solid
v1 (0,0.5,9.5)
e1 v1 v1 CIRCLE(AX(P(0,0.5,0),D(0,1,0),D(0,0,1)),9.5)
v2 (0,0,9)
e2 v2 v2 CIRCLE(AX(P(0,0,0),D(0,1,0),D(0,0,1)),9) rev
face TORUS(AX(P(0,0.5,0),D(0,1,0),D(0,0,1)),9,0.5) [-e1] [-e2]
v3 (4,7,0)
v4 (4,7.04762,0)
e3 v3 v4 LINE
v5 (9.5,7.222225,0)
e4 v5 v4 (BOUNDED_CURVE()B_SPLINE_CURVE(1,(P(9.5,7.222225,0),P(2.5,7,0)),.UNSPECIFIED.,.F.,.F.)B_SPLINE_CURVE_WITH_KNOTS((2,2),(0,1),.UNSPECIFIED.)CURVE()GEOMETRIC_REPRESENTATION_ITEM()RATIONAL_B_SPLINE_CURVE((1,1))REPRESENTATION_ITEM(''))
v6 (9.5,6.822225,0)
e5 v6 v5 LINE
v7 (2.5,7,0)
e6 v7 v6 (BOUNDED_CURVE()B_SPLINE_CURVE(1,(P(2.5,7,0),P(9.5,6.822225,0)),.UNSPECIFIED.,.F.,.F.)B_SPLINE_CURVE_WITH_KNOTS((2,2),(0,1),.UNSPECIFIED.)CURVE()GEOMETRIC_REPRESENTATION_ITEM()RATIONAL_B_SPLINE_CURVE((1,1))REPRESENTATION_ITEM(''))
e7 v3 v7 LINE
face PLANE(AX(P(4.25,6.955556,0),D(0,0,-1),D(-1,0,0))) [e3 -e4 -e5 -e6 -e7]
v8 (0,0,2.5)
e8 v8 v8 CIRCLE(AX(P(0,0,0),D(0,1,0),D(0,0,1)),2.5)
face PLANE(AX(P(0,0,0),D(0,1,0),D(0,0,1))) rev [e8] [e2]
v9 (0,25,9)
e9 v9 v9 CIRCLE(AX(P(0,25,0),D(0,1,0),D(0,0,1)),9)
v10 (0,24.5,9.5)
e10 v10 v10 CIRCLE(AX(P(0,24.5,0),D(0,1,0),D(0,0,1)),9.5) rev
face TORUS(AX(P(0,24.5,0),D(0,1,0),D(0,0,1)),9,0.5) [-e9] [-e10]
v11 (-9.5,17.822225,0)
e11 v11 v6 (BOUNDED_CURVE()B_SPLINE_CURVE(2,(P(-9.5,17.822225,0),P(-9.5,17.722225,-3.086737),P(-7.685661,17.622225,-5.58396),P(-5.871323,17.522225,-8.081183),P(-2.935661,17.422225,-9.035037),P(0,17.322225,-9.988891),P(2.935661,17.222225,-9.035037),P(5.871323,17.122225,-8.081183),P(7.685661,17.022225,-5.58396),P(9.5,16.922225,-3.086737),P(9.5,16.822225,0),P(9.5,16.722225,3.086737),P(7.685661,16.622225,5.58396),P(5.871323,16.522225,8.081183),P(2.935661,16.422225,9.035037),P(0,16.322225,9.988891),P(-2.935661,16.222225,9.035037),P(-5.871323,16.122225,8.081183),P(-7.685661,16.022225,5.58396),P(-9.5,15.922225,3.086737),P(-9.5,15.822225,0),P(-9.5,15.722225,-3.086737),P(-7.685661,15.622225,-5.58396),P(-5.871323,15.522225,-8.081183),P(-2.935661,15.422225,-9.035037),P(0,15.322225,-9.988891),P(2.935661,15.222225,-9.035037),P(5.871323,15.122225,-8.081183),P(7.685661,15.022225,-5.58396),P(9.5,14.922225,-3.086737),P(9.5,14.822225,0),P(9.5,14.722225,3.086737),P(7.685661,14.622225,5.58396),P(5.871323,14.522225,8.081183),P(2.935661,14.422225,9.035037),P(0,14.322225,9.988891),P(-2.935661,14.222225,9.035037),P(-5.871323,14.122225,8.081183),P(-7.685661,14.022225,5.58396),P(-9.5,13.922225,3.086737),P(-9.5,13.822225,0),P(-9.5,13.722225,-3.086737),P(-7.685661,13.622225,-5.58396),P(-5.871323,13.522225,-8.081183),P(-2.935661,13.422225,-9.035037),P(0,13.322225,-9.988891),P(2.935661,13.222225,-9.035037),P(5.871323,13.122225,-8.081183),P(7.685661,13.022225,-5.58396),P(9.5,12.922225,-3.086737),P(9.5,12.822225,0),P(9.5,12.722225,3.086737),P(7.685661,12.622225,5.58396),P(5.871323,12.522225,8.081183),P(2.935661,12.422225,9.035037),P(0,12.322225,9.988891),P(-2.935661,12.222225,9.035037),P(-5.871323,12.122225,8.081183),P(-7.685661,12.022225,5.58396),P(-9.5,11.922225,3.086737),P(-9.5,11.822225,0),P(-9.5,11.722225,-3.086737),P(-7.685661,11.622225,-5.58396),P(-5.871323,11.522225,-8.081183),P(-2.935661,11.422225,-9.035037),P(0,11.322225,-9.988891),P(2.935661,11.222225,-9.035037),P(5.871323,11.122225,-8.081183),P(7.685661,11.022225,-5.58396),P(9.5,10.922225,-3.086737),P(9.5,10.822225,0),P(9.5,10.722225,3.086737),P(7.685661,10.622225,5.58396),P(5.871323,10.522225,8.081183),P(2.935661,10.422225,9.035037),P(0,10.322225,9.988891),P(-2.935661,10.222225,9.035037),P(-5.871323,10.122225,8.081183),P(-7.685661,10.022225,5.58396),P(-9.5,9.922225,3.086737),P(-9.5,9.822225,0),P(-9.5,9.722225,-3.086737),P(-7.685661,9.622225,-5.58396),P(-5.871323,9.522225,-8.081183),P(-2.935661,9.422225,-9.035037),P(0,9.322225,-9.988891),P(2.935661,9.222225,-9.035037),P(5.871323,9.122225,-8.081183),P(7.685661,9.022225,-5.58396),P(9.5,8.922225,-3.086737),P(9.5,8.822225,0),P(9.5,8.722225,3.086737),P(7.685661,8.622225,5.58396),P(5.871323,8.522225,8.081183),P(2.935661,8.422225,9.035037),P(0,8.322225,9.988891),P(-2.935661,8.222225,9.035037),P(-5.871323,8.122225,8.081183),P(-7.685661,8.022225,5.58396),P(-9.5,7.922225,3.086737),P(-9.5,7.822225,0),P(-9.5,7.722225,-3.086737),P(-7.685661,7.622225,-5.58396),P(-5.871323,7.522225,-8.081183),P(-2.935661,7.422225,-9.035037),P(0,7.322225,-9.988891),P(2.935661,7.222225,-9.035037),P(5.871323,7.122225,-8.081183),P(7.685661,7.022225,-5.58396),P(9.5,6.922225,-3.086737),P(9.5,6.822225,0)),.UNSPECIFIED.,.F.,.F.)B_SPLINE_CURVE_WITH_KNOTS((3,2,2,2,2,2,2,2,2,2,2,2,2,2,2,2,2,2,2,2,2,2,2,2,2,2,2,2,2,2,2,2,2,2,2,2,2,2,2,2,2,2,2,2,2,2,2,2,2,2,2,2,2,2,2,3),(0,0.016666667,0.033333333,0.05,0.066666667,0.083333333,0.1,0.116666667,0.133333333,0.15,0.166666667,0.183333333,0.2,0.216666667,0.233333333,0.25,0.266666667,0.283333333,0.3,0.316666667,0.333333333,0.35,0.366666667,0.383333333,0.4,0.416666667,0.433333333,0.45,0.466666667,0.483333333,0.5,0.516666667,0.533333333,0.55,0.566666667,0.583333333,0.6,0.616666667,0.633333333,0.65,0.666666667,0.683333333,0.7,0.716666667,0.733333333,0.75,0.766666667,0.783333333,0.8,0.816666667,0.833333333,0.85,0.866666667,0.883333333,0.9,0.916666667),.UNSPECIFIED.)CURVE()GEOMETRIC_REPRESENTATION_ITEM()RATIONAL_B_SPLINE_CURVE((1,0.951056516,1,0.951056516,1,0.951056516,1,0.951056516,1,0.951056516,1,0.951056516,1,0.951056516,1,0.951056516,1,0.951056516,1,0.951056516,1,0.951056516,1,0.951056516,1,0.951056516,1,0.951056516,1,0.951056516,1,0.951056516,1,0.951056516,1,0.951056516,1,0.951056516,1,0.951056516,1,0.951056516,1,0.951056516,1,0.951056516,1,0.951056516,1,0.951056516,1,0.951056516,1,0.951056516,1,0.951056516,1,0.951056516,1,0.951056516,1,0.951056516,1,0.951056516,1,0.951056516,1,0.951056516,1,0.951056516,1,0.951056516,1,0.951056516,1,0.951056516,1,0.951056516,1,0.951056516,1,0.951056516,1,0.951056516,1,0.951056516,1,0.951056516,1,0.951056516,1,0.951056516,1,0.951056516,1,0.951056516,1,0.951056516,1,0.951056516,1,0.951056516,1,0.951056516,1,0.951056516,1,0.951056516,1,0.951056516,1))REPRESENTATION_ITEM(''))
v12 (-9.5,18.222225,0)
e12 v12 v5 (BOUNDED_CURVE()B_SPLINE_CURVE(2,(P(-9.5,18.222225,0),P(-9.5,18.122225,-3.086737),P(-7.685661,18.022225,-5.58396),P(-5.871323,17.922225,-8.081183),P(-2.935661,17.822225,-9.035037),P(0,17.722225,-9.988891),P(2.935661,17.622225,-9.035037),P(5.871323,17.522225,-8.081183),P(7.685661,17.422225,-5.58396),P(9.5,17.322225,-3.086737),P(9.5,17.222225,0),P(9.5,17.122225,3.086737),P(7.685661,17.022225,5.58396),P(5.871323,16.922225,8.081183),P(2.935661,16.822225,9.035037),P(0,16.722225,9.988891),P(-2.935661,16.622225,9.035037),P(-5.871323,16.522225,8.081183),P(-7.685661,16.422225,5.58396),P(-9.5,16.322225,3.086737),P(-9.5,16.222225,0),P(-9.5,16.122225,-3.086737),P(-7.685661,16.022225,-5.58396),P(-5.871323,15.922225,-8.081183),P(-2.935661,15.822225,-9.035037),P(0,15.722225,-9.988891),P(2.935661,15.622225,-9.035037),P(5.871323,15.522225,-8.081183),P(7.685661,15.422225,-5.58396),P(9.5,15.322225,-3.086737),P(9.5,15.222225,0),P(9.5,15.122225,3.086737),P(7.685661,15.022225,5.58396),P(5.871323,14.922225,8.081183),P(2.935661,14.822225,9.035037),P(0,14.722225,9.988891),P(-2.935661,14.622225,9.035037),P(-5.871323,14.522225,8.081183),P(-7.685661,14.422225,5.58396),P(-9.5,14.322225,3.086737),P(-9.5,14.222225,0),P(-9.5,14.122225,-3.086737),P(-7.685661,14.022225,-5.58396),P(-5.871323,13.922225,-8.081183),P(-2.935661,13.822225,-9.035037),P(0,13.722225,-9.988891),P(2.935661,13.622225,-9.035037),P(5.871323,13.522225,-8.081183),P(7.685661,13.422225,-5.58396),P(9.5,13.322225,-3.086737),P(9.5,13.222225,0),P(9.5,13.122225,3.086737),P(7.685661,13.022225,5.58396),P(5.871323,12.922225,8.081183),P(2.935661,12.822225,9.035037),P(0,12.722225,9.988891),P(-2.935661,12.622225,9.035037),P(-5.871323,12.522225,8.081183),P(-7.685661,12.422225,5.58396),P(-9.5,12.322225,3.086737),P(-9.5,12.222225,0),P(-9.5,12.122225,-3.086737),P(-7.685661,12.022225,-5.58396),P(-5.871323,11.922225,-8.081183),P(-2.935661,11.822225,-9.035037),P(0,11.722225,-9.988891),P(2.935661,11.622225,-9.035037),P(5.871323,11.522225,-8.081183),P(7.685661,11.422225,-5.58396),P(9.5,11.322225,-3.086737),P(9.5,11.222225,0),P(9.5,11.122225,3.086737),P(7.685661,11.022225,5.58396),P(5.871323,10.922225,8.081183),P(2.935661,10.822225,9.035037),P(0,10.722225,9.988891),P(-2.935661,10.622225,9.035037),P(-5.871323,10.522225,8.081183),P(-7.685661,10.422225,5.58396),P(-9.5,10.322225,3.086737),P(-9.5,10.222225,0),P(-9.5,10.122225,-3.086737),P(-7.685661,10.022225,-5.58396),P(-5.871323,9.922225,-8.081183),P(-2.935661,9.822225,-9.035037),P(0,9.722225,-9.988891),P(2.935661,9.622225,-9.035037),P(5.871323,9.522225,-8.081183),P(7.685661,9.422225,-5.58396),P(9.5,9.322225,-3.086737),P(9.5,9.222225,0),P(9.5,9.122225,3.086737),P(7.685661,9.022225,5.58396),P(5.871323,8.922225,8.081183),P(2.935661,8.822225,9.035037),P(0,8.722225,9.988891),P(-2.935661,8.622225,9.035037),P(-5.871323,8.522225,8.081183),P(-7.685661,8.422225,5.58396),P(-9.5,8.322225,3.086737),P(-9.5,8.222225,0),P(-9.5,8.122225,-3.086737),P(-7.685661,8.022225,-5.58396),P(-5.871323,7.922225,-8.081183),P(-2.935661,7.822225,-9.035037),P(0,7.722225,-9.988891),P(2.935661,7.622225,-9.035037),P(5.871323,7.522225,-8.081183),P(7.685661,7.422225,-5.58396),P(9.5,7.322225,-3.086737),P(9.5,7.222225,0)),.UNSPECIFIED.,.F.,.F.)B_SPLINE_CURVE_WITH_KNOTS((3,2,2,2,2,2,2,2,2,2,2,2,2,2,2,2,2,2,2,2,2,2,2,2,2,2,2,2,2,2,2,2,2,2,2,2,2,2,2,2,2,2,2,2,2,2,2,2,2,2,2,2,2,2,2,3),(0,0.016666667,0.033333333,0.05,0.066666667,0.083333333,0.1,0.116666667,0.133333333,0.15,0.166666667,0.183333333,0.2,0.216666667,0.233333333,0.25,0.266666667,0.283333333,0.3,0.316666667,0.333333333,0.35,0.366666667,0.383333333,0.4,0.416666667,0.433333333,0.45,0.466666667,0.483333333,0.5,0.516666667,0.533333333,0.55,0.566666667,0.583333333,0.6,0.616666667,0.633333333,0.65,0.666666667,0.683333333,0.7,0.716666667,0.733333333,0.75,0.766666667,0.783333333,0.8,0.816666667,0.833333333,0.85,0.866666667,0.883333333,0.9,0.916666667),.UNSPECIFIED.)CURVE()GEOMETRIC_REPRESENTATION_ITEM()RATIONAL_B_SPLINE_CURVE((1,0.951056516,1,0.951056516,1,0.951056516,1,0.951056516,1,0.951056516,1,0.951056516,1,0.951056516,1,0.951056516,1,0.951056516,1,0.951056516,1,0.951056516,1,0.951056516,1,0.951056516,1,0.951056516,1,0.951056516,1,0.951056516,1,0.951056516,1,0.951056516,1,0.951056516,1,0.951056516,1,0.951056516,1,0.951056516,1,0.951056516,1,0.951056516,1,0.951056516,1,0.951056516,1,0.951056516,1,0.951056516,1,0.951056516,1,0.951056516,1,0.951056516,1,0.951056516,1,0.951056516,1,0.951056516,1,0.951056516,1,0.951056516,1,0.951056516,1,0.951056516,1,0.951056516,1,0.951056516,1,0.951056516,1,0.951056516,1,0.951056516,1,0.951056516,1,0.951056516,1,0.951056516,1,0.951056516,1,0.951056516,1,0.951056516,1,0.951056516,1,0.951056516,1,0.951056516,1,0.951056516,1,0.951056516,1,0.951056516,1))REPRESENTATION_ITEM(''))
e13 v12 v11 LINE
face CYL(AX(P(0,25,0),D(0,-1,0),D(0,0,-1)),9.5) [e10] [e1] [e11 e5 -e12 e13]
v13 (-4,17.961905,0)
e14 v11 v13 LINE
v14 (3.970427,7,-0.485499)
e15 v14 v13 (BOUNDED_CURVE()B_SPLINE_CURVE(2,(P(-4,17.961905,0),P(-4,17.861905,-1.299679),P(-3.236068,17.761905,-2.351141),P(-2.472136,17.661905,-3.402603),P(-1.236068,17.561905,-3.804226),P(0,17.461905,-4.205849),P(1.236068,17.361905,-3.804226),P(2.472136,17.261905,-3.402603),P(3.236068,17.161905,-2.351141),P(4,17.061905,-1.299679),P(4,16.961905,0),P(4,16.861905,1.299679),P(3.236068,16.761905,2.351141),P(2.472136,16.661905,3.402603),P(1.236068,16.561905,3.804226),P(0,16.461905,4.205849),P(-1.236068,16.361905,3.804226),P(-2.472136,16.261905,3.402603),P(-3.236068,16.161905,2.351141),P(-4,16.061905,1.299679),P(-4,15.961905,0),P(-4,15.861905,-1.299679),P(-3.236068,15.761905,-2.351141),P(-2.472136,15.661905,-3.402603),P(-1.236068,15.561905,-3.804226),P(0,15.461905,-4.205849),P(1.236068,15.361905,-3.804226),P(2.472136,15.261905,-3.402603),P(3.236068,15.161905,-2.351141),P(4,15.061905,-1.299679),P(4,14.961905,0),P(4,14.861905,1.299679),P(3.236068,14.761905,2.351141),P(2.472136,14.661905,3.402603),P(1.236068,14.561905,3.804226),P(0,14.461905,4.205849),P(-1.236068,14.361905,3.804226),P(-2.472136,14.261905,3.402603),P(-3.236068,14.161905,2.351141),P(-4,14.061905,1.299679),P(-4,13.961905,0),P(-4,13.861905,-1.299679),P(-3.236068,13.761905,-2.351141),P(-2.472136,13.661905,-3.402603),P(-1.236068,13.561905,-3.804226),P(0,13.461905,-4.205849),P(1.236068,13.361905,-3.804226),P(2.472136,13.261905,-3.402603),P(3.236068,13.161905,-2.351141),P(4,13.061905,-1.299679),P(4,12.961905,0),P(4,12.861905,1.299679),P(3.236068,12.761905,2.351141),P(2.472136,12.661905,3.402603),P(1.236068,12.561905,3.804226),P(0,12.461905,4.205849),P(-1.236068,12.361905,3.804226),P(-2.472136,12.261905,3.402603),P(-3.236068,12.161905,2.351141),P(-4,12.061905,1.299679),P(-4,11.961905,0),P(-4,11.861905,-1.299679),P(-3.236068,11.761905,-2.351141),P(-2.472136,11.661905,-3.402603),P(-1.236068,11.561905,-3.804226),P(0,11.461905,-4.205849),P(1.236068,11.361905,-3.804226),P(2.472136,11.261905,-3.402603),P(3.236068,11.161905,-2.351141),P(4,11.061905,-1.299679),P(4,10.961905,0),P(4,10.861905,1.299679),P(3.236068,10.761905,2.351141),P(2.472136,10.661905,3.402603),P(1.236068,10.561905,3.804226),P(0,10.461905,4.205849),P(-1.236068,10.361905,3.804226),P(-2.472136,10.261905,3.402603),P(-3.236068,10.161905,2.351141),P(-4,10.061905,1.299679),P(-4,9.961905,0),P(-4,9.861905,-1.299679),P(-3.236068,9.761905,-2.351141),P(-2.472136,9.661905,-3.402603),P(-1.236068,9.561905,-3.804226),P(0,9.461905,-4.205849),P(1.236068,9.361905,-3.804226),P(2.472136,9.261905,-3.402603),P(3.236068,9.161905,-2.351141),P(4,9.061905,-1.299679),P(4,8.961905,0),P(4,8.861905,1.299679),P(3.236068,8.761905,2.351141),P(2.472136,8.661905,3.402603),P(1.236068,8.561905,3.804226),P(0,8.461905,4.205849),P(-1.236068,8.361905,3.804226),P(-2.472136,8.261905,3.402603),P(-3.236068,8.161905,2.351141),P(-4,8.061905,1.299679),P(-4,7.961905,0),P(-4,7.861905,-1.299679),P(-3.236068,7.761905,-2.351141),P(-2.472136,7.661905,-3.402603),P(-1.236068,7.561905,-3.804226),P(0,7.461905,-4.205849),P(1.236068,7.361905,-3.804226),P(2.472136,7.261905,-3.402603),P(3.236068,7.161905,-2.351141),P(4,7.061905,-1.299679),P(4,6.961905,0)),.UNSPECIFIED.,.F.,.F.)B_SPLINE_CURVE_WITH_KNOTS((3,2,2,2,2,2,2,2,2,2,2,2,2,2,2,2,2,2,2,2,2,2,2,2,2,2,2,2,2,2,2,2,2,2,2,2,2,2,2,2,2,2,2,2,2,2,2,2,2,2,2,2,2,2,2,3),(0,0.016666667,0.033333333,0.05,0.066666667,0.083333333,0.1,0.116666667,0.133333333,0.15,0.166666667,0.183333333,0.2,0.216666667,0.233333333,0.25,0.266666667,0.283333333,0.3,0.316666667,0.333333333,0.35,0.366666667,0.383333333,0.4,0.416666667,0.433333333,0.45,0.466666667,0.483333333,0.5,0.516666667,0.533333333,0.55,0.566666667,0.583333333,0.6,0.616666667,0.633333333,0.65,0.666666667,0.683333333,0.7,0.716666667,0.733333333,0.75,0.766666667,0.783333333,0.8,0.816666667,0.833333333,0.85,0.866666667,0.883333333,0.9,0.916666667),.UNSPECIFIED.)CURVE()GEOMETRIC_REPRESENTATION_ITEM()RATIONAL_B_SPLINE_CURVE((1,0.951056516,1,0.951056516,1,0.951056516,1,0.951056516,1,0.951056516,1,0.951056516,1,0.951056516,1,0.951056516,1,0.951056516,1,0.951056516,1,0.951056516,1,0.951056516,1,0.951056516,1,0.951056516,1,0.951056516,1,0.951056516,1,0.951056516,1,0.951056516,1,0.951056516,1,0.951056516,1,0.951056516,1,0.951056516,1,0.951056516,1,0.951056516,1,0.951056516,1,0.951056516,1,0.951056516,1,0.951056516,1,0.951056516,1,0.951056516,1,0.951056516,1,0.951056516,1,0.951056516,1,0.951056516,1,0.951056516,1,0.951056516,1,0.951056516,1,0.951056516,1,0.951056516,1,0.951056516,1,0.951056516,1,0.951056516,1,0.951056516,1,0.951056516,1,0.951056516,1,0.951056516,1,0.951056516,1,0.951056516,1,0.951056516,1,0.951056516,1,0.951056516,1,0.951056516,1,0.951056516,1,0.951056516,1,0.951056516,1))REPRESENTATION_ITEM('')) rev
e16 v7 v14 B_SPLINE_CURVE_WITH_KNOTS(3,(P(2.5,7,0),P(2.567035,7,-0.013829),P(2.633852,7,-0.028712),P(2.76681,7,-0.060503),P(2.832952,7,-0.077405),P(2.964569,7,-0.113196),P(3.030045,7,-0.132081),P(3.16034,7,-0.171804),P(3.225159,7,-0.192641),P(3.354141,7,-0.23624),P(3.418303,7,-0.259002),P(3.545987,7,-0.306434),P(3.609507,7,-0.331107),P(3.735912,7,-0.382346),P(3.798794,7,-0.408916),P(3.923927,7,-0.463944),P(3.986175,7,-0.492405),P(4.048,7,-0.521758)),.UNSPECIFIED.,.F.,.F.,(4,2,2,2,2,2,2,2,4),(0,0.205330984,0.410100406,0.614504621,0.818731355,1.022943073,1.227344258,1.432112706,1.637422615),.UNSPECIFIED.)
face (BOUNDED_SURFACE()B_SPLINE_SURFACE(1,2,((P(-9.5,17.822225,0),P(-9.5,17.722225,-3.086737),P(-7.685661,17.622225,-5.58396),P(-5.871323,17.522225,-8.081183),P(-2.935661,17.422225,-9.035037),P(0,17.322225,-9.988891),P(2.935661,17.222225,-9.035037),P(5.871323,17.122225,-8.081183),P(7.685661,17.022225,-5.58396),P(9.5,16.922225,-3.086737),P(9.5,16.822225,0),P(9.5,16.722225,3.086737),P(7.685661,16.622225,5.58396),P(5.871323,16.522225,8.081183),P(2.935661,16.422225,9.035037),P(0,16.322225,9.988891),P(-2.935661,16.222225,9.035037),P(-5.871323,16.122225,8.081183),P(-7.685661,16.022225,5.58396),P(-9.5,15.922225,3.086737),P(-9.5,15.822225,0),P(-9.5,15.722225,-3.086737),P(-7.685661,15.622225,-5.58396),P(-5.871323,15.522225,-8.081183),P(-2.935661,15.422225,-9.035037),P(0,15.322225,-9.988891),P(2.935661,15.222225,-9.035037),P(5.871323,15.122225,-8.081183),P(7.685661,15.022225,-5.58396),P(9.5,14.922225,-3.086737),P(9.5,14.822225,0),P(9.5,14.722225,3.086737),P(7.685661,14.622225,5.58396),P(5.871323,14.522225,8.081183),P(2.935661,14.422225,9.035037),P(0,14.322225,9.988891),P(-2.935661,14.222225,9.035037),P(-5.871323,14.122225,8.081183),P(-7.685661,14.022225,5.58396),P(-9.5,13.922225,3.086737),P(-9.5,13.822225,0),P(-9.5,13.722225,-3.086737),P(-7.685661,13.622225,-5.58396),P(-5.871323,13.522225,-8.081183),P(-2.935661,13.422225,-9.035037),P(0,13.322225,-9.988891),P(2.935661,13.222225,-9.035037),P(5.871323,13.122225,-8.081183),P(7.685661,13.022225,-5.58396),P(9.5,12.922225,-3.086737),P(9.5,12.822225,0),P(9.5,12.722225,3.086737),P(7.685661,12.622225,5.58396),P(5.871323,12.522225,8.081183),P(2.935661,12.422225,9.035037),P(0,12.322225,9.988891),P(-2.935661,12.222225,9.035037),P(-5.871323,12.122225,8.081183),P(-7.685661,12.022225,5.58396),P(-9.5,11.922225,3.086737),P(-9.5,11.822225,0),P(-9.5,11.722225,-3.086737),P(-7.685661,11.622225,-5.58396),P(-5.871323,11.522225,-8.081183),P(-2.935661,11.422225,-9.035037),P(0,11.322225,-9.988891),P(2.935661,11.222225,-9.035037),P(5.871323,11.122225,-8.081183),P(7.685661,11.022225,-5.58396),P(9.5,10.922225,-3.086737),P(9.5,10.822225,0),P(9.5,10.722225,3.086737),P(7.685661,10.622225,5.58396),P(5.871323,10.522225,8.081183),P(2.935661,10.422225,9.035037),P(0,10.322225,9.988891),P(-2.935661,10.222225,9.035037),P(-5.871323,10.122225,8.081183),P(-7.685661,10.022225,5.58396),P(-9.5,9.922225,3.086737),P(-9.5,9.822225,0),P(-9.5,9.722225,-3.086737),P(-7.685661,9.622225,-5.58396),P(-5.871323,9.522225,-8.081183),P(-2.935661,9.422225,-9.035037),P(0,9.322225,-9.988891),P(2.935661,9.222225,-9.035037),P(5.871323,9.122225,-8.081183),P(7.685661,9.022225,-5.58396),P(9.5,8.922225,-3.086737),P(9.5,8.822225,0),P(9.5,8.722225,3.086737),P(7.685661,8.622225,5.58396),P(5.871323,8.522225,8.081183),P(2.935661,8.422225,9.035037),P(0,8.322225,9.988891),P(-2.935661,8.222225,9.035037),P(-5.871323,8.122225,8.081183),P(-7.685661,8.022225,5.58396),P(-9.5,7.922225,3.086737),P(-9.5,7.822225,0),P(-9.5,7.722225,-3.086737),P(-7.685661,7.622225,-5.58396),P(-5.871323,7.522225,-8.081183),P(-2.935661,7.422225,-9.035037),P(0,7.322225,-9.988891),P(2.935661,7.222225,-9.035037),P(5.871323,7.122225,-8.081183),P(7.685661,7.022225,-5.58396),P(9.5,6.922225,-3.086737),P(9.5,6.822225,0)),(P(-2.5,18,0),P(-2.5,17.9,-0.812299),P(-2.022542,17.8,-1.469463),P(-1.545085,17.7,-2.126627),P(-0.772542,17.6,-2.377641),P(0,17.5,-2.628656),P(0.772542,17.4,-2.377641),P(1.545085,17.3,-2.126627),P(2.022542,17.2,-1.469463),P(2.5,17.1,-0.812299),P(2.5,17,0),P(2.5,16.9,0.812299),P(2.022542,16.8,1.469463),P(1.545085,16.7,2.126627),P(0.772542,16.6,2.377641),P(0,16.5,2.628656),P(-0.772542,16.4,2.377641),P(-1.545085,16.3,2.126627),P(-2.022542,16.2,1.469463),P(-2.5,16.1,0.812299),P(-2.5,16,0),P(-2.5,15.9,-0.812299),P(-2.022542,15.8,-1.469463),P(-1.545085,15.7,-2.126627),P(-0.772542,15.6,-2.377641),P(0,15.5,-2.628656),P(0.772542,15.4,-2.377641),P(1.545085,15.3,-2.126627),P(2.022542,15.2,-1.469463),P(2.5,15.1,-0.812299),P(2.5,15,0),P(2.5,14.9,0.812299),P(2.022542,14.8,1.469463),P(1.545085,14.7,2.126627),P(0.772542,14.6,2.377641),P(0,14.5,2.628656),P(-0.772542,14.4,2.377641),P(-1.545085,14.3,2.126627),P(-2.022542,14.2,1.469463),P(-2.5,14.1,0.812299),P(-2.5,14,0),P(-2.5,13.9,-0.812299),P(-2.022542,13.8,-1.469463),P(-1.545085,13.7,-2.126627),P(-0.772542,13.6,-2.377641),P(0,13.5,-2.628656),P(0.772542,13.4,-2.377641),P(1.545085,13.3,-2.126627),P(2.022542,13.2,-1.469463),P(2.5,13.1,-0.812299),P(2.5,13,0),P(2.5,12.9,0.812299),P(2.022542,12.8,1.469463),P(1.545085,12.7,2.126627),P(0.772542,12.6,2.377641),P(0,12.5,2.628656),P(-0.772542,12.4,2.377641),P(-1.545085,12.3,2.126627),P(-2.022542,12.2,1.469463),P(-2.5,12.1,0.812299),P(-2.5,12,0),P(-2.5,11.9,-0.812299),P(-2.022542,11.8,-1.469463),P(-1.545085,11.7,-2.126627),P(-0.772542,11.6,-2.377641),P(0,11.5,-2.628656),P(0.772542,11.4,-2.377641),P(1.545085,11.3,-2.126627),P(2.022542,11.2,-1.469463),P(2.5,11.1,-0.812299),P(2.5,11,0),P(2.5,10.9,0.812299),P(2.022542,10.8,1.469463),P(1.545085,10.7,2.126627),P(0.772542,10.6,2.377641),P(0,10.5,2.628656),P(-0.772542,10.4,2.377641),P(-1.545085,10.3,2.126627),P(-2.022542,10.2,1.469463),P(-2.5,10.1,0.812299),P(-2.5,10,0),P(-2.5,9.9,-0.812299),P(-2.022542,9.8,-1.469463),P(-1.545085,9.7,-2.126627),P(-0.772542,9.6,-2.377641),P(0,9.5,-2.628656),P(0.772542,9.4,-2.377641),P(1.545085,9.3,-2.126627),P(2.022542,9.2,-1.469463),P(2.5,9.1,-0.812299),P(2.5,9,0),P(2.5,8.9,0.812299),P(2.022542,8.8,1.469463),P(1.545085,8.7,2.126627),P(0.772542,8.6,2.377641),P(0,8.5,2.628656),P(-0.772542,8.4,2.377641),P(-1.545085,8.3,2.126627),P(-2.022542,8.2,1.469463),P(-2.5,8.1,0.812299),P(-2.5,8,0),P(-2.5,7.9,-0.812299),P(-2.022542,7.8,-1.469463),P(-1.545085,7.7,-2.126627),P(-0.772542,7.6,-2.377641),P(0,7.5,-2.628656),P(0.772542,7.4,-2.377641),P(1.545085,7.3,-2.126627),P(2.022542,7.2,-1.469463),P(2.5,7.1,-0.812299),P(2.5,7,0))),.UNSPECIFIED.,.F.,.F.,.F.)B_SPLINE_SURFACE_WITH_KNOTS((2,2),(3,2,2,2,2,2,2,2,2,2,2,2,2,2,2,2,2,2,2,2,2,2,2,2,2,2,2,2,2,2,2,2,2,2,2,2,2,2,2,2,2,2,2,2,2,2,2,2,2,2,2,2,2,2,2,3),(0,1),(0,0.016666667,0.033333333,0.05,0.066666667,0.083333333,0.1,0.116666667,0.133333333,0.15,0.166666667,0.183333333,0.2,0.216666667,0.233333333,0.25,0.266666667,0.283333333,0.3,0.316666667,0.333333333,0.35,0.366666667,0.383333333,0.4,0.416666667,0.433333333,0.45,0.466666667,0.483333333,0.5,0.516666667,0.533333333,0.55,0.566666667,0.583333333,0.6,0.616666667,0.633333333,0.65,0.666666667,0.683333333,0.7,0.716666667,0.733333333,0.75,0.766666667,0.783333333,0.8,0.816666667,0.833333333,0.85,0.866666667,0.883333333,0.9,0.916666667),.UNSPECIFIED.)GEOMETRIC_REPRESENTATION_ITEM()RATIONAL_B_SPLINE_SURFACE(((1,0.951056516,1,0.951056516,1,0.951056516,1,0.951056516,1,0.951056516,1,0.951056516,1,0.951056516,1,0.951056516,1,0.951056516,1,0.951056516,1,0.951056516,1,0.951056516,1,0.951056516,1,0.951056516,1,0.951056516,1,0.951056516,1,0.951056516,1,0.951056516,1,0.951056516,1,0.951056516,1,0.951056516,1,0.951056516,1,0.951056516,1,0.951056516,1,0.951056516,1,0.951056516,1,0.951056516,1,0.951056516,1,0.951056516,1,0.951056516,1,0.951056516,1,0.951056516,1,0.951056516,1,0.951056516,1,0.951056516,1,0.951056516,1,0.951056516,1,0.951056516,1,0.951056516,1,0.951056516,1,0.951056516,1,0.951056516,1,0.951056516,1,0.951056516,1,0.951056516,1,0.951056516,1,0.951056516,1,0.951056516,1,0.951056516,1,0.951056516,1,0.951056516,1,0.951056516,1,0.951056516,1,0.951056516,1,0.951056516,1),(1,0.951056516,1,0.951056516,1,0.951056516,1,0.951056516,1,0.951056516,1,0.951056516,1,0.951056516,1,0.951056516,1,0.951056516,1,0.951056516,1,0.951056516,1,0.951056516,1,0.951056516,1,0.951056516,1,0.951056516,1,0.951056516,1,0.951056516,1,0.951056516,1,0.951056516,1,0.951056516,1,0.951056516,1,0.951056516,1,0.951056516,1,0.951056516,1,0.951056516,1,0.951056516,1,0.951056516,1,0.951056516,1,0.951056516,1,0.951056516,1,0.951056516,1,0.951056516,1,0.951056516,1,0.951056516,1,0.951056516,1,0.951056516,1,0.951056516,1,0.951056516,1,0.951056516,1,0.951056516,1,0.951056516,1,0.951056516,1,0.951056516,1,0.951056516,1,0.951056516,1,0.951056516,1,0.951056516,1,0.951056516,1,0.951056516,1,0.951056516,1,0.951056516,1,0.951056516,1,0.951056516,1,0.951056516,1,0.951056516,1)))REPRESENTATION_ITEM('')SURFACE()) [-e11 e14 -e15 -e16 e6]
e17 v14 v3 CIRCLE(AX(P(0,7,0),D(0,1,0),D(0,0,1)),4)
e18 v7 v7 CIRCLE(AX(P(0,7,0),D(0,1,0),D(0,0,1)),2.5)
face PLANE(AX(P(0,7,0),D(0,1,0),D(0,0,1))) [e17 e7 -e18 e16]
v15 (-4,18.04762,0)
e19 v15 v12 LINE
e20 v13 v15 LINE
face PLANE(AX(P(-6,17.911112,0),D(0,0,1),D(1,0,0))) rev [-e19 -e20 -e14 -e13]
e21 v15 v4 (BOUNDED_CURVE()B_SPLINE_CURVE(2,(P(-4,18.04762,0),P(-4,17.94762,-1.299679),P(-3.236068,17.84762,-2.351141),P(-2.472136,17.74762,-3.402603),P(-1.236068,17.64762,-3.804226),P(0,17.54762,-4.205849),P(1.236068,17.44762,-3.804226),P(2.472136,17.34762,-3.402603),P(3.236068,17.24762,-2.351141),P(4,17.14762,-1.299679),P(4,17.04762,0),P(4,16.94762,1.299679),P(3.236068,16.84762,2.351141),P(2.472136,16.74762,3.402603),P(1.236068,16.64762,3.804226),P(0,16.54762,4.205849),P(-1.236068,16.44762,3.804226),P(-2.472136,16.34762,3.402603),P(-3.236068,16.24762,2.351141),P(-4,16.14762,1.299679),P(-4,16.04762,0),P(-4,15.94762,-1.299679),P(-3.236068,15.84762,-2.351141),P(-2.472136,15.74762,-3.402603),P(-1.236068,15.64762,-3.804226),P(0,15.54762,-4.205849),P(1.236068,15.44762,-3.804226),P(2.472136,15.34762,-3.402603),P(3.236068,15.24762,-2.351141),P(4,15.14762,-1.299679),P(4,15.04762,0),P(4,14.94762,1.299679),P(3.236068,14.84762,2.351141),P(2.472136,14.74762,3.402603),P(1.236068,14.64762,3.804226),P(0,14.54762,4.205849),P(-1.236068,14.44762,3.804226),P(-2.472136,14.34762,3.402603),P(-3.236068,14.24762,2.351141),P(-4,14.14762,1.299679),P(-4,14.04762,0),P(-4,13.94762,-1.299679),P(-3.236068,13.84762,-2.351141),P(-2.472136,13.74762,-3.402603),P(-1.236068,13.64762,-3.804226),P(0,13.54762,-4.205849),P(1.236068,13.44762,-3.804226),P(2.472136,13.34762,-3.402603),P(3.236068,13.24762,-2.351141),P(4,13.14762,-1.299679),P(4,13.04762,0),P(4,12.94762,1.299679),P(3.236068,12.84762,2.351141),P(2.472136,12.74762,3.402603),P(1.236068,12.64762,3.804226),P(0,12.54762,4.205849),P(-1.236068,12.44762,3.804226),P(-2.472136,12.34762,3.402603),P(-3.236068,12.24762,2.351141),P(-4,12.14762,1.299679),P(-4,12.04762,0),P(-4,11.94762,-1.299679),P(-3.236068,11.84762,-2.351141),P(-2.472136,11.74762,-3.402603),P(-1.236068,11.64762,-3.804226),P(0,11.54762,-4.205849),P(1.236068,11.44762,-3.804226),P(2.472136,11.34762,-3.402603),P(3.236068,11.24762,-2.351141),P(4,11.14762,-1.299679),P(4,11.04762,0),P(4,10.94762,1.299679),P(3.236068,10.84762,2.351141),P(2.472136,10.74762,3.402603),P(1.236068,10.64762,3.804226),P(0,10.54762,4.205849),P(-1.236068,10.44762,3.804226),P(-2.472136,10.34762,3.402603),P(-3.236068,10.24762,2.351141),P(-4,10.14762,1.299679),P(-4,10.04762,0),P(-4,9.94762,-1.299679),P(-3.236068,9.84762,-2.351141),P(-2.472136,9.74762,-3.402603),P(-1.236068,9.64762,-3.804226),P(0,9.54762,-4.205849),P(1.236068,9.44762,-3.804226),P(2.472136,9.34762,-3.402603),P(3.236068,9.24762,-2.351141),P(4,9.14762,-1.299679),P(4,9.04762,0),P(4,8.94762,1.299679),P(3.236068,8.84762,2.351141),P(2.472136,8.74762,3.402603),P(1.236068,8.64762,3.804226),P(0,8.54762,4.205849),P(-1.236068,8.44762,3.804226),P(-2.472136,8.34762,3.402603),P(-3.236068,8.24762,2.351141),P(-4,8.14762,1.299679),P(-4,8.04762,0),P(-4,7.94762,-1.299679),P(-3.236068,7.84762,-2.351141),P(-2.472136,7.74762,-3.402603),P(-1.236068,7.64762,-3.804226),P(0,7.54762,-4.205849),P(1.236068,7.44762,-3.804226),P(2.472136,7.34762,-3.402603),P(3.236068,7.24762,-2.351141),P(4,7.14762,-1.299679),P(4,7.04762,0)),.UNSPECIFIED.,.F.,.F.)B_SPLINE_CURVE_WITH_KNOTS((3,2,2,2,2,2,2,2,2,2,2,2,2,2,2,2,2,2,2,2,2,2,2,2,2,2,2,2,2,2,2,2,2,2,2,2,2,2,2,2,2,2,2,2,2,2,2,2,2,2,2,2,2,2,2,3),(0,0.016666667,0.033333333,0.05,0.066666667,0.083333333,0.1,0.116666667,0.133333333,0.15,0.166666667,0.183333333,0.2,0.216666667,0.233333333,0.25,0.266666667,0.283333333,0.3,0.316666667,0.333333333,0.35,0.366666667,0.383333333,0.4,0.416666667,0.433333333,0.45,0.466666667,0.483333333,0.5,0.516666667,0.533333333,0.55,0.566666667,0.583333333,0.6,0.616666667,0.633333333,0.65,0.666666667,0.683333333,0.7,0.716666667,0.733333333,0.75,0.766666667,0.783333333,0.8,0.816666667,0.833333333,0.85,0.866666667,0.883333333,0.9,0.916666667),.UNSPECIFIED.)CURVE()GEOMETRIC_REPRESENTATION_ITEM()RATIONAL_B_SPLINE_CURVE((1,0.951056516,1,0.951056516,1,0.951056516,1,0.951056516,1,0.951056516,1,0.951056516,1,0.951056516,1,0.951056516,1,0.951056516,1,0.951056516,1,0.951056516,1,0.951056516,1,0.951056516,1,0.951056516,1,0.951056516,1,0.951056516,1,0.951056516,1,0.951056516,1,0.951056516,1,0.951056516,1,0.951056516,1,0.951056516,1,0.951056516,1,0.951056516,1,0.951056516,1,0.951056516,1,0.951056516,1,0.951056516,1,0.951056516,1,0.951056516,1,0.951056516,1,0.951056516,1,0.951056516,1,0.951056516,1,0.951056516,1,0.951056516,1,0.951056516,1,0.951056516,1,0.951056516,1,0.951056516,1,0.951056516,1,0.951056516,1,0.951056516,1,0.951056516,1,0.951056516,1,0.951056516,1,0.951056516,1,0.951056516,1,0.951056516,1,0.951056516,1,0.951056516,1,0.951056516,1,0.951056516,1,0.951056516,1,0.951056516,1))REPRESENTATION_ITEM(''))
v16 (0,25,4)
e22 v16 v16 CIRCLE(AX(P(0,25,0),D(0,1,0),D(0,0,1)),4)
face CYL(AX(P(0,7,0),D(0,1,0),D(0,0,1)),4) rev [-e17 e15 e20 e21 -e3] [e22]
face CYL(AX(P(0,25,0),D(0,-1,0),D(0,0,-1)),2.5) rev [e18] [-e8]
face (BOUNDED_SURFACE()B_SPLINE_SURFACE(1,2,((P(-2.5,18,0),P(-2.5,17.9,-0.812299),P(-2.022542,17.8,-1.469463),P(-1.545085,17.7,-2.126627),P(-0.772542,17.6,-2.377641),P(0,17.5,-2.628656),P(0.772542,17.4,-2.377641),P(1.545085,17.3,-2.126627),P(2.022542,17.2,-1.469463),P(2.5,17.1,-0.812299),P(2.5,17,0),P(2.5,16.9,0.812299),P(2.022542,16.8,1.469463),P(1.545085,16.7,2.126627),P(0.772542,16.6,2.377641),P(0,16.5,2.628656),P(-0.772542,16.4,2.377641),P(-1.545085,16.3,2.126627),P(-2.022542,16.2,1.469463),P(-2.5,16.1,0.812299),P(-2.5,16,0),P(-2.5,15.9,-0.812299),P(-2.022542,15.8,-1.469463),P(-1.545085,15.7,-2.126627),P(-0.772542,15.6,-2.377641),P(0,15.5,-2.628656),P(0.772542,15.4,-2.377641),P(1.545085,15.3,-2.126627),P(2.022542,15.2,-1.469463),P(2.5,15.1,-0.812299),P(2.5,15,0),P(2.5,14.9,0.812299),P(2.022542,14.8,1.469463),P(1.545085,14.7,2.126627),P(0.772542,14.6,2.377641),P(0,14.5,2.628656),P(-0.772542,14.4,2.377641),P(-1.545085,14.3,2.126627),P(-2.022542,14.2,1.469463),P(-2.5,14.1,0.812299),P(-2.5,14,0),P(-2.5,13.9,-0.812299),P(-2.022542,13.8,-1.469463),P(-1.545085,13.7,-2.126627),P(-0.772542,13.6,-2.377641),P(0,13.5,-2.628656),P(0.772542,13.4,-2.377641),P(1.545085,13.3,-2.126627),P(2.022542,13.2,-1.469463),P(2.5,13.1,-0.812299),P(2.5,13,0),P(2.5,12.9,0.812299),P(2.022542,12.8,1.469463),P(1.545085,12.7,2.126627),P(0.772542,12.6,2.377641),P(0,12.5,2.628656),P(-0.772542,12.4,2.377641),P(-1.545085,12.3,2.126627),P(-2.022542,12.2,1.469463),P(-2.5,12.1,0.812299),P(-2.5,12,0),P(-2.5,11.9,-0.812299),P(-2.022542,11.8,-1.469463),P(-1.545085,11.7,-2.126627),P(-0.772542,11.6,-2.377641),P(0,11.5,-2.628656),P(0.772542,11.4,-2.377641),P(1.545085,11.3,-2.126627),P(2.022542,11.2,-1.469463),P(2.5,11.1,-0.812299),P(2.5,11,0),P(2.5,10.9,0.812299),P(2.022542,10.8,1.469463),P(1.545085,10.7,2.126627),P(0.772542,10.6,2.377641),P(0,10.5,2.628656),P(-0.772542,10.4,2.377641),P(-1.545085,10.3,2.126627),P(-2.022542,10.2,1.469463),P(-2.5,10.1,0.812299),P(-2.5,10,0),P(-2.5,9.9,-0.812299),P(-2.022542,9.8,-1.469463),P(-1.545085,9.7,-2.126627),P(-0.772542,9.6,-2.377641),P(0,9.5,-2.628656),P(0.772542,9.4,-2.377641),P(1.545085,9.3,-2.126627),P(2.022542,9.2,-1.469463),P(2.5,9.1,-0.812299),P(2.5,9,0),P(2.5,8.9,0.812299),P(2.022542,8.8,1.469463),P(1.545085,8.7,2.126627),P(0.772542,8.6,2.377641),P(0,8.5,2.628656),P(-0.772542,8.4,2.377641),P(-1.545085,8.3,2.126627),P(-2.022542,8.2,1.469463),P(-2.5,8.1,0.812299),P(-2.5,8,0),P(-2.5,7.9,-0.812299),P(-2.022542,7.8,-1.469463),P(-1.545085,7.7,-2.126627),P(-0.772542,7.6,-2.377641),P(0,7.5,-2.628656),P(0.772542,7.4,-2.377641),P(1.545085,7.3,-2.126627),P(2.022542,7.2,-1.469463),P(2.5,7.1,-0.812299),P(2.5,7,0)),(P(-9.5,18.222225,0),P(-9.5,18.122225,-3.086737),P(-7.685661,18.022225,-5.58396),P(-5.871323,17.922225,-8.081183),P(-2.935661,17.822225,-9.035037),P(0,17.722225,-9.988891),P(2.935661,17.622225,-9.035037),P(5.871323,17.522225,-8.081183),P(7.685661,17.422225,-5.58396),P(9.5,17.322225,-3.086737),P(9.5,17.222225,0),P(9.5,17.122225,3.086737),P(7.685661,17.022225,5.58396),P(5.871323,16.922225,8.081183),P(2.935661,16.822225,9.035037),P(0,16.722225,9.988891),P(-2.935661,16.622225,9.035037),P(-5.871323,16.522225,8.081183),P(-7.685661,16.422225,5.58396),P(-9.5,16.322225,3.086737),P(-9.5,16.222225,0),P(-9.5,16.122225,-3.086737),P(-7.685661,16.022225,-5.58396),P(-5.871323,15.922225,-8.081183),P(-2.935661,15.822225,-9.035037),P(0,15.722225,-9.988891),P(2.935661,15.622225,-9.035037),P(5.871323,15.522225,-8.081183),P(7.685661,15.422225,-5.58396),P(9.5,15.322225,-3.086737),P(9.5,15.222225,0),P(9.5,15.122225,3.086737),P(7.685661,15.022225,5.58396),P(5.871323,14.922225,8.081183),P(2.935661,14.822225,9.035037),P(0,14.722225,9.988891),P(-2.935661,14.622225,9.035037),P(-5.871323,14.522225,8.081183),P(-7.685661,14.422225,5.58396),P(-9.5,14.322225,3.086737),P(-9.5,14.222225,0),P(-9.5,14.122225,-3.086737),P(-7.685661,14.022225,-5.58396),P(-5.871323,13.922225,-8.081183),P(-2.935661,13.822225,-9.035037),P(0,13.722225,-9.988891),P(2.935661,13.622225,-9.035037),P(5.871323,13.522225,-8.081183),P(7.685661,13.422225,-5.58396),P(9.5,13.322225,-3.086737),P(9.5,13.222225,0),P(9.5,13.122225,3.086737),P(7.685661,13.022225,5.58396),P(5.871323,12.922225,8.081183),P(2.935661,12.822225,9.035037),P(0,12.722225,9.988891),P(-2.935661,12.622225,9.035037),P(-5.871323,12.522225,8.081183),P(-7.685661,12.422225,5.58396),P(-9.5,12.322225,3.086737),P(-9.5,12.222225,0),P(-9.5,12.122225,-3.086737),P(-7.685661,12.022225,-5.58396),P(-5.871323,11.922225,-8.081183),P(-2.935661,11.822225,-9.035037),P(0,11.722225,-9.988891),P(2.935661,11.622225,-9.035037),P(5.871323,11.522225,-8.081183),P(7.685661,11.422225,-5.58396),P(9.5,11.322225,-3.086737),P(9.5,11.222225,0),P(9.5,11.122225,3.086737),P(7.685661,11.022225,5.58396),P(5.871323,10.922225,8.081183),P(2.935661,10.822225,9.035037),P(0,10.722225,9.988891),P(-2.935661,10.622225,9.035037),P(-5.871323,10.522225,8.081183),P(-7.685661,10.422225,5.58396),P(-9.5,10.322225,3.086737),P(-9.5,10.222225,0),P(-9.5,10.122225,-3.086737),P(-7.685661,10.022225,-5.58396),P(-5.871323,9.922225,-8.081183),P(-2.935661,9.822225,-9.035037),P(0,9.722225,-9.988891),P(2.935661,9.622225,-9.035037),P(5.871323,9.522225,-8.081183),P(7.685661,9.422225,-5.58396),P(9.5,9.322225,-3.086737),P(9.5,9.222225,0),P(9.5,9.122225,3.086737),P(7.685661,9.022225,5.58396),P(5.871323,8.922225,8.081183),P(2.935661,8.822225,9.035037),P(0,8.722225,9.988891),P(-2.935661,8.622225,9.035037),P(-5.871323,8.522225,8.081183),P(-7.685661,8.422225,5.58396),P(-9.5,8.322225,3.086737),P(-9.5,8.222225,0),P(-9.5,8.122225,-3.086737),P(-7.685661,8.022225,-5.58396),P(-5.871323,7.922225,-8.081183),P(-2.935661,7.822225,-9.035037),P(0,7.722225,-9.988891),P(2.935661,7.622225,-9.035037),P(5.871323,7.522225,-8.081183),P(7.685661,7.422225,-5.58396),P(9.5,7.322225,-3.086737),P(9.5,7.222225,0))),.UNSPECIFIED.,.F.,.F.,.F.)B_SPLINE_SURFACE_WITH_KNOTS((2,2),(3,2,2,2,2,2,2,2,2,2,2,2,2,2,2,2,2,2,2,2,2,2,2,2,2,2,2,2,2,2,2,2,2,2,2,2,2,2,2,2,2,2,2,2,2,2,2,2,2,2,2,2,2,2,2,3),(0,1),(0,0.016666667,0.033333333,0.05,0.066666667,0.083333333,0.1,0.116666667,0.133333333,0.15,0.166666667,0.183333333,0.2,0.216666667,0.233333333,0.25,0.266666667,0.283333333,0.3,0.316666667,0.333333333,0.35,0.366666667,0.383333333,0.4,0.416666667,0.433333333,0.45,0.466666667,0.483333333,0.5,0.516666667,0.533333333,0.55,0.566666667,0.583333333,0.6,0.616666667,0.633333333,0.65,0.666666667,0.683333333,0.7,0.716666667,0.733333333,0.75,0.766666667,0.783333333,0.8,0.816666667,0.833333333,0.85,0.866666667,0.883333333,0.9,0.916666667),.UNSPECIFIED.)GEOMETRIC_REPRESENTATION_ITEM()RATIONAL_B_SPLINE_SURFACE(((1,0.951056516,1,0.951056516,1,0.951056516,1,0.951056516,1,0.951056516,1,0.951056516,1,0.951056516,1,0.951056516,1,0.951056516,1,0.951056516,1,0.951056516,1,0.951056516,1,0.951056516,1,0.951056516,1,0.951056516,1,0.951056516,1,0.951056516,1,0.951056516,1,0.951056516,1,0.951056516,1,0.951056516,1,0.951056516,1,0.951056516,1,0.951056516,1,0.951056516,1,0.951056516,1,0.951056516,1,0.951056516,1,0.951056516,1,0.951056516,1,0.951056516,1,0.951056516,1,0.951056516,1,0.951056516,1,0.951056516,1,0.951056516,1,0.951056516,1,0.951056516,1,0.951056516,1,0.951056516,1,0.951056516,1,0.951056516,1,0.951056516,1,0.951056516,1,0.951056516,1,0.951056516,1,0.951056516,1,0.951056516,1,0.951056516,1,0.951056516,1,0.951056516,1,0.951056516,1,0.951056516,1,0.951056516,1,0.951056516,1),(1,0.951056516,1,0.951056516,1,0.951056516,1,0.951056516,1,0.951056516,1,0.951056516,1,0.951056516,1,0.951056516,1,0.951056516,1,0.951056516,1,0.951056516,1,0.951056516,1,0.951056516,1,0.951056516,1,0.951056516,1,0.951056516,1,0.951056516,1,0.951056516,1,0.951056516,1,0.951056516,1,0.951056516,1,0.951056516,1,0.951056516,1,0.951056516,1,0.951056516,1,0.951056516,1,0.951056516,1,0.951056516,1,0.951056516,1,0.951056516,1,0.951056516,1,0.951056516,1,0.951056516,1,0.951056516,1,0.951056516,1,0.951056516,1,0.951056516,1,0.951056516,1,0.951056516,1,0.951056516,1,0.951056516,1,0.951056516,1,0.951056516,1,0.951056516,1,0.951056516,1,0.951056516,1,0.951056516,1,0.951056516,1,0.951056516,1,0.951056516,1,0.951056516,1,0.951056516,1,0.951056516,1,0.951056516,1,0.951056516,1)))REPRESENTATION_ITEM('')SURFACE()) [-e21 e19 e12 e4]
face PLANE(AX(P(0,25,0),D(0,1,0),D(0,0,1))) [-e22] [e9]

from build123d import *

# Parameters (mm, degrees)
SKETCH1_R           = 9.5
SKETCH1_R_2         = 2.5
BOSS_EXTRUDE1_DEPTH = 25
SKETCH2_R           = 4
CUT_EXTRUDE1_DEPTH  = 18
FILLET1_R           = 0.5
CUT_SWEEP2_PITCH    = 2


with BuildPart() as part:
    # Sketch1 → Boss-Extrude1 (new body)
    with BuildSketch(Plane(origin=(0, 0, 0), x_dir=(1, 0, 0), z_dir=(0, 1, 0))):
        with Locations(Location((0, 0, 0), (0, 0, 270))):
            Circle(SKETCH1_R)
        with Locations(Location((0, 0, 0), (0, 0, 270))):
            Circle(SKETCH1_R_2, mode=Mode.SUBTRACT)
    extrude(amount=BOSS_EXTRUDE1_DEPTH)

    # Sketch2 → Cut-Extrude1 (cut)
    with BuildSketch(Plane(origin=(0, 25, 0), x_dir=(1, 0, 0), z_dir=(0, 1, 0))):
        with Locations(Location((0, 0, 0), (0, 0, 270))):
            Circle(SKETCH2_R)
    extrude(amount=-CUT_EXTRUDE1_DEPTH, mode=Mode.SUBTRACT)

    # Fillet1
    fillet1_edges = [part.edges().sort_by_distance(p)[0] for p in [
        (0, 0, -9.5),
        (0, 25, -9.5),
    ]]
    fillet(fillet1_edges, radius=FILLET1_R)

    # Cut-Sweep2: the profile of Sketch4 profile screwed along a right-hand helix of 5.5 turns, 10 arcs to a turn; built about Z, then put on its axis
    cut_sweep2_z = Axis((0, 0, 0), (0, 0, 1))
    cut_sweep2_corners = [(9.5003, 0, -0.222234504), (2.5, 0, 0), (9.5003, 0, 0.177782639)]
    with BuildLine(mode=Mode.PRIVATE) as cut_sweep2_profile:
        Line(cut_sweep2_corners[0], cut_sweep2_corners[1])
        Line(cut_sweep2_corners[1], cut_sweep2_corners[2])
        Line(cut_sweep2_corners[2], cut_sweep2_corners[0])
    cut_sweep2_cap = Face(cut_sweep2_profile.wire())
    cut_sweep2_turn_angles = [0, 18, 36, 54, 72, 90, 108, 126, 144, 162, 180, 198, 216, 234, 252, 270, 288, 306, 324, 342, 360]
    cut_sweep2_turn_weights = [1, 0.9510565162951535, 1, 0.9510565162951535, 1, 0.9510565162951535, 1, 0.9510565162951535, 1, 0.9510565162951535, 1, 0.9510565162951535, 1, 0.9510565162951535, 1, 0.9510565162951535, 1, 0.9510565162951535, 1, 0.9510565162951535, 1]
    cut_sweep2_turn_rails = [Edge.make_bspline([Vector(p[0], p[1], 0).rotate(cut_sweep2_z, cut_sweep2_turn_angles[k]) / cut_sweep2_turn_weights[k] + Vector(0, 0, p[2] + CUT_SWEEP2_PITCH * cut_sweep2_turn_angles[k] / 360) for k in range(21)], [0, 0, 0, 1, 1, 2, 2, 3, 3, 4, 4, 5, 5, 6, 6, 7, 7, 8, 8, 9, 9, 10, 10, 10], 2, cut_sweep2_turn_weights) for p in cut_sweep2_corners]
    cut_sweep2_turn_sides = [Face.make_surface_from_curves(cut_sweep2_turn_rails[p[0]], cut_sweep2_turn_rails[p[1]]) for p in [(0, 1), (1, 2), (2, 0)]]
    cut_sweep2_last_angles = [1800, 1818, 1836, 1854, 1872, 1890, 1908, 1926, 1944, 1962, 1980]
    cut_sweep2_last_weights = [1, 0.9510565162951535, 1, 0.9510565162951535, 1, 0.9510565162951535, 1, 0.9510565162951535, 1, 0.9510565162951401, 1]
    cut_sweep2_last_rails = [Edge.make_bspline([Vector(p[0], p[1], 0).rotate(cut_sweep2_z, cut_sweep2_last_angles[k]) / cut_sweep2_last_weights[k] + Vector(0, 0, p[2] + CUT_SWEEP2_PITCH * cut_sweep2_last_angles[k] / 360) for k in range(11)], [0, 0, 0, 1, 1, 2, 2, 3, 3, 4, 4, 5, 5, 5], 2, cut_sweep2_last_weights) for p in cut_sweep2_corners]
    cut_sweep2_last_sides = [Face.make_surface_from_curves(cut_sweep2_last_rails[p[0]], cut_sweep2_last_rails[p[1]]) for p in [(0, 1), (1, 2), (2, 0)]]
    cut_sweep2 = Plane(origin=(0, 18, 0), x_dir=(-1, 0, 0), z_dir=(0, -1, 0)) * Solid(Shell([*[p.moved(Location((0, 0, CUT_SWEEP2_PITCH * i))) for i in range(5) for p in cut_sweep2_turn_sides], *cut_sweep2_last_sides, cut_sweep2_cap, cut_sweep2_cap.rotate(cut_sweep2_z, 1980).moved(Location((0, 0, CUT_SWEEP2_PITCH * 1980 / 360)))]))
    add(cut_sweep2, mode=Mode.SUBTRACT)


solid = part.part
